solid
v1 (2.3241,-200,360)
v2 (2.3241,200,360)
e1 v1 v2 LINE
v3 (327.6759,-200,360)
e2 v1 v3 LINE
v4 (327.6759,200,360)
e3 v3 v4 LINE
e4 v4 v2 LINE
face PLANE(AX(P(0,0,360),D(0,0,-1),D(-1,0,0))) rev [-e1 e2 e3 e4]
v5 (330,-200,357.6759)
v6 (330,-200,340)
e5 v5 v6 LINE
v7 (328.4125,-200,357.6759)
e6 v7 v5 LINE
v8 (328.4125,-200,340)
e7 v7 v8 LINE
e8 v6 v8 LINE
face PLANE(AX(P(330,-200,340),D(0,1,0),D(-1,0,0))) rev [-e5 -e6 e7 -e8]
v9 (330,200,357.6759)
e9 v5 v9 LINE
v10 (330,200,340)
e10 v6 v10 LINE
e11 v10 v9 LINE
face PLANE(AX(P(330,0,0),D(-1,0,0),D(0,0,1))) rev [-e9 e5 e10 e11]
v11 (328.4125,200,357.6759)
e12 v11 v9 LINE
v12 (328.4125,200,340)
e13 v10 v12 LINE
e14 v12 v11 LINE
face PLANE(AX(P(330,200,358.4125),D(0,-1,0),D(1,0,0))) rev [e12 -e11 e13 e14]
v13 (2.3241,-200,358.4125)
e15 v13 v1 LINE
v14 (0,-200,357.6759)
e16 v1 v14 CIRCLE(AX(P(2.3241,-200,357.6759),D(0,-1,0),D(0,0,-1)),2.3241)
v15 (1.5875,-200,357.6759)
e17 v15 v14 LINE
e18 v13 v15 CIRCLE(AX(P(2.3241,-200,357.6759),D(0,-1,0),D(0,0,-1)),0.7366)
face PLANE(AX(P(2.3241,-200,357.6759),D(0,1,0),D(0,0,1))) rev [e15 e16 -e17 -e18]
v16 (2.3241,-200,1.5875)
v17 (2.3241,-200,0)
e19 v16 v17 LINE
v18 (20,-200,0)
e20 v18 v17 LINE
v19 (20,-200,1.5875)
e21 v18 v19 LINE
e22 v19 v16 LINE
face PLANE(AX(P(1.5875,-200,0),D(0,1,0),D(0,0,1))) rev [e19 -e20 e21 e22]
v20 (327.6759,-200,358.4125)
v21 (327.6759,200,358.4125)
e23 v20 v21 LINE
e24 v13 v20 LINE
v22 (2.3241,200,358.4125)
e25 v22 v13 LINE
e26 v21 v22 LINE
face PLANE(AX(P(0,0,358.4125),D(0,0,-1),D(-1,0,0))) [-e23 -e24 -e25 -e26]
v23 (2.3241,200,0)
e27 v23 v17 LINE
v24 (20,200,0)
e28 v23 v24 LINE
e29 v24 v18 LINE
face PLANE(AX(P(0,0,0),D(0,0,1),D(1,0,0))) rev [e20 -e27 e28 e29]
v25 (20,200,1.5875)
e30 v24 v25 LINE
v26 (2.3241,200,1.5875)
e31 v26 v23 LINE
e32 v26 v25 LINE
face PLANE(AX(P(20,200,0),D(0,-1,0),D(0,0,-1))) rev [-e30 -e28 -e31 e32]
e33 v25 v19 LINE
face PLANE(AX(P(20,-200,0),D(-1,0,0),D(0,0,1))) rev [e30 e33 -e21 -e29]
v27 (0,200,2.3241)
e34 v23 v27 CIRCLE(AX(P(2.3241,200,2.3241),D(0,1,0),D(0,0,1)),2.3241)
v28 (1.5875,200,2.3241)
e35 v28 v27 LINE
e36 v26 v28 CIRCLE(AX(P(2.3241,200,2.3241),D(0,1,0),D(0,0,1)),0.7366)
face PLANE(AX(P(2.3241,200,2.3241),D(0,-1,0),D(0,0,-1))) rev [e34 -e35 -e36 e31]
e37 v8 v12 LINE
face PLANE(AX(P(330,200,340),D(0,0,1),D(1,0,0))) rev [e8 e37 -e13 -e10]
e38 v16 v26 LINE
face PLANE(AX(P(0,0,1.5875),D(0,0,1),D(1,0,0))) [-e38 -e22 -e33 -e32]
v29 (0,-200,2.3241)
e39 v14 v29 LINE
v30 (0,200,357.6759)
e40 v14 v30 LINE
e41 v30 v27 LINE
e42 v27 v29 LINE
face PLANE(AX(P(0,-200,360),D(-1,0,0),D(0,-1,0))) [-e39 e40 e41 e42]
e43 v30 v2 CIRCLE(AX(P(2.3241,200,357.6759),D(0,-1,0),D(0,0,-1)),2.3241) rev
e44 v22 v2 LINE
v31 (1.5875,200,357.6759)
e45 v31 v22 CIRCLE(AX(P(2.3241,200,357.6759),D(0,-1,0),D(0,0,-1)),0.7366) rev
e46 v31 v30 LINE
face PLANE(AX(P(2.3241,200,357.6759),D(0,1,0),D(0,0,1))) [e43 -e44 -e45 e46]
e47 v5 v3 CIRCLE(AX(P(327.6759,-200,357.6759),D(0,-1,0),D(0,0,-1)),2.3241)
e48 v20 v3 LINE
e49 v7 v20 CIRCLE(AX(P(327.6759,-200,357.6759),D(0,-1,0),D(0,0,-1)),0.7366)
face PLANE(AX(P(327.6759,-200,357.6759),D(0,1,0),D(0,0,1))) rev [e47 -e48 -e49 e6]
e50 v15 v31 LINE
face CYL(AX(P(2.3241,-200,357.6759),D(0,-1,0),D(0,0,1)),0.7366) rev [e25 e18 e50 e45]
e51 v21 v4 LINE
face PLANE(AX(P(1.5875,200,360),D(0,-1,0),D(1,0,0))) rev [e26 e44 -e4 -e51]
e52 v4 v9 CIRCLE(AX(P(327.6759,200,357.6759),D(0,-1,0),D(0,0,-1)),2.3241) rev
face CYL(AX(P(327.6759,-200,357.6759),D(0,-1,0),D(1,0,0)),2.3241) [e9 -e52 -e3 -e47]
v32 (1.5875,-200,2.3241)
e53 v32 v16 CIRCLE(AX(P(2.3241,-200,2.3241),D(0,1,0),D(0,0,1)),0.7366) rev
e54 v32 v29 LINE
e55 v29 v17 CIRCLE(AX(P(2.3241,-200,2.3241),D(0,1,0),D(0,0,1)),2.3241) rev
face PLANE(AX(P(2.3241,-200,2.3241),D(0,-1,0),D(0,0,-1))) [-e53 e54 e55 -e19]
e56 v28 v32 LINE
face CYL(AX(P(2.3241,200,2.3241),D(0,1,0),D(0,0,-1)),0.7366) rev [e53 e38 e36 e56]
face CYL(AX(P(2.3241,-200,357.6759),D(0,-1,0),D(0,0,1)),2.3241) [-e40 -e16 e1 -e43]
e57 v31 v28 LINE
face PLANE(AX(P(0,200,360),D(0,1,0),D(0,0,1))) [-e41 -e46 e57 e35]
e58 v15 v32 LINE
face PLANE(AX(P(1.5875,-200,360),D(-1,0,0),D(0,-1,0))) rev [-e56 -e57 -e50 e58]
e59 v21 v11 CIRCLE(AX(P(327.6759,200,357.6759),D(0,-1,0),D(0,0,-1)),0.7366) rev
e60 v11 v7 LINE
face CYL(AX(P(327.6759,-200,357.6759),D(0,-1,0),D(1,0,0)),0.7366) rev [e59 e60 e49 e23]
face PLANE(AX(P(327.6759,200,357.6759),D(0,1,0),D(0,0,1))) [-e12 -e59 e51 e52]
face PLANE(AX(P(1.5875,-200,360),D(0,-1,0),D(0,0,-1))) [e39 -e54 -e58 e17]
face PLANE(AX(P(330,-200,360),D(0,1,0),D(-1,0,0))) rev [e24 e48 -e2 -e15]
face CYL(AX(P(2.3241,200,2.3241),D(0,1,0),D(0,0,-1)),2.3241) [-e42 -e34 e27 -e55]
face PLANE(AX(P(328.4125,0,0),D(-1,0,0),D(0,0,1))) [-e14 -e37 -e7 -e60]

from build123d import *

# Parameters (mm, degrees)
SKETCH1_W                      = 1.5875
SKETCH1_H                      = 400
BASE_FLANGE1_DEPTH             = 360
EDGE_FLANGE1_STRIP_W           = 7.8232
EDGE_FLANGE1_STRIP_H           = 1.5875
EDGE_FLANGE1_STRIP_CUT_DEPTH   = 400
EDGE_FLANGE1_DEPTH             = 400
EDGE_FLANGE2_STRIP_W           = 7.8232
EDGE_FLANGE2_STRIP_H           = 1.5875
EDGE_FLANGE2_STRIP_CUT_DEPTH   = 400
EDGE_FLANGE2_STRIP_2_W         = 7.8232
EDGE_FLANGE2_STRIP_2_H         = 1.5875
EDGE_FLANGE2_STRIP_CUT_2_DEPTH = 400
EDGE_FLANGE2_DEPTH             = 400
EDGE_FLANGE2_BEND_DEPTH        = 400


# Sheet-metal steps are written as plain solids
with BuildPart() as part:
    # Sketch1 → Base-Flange1 (new body)
    with BuildSketch(Plane.XY):
        with Locations((0.79375, 0)):
            Rectangle(SKETCH1_W, SKETCH1_H)
    extrude(amount=BASE_FLANGE1_DEPTH)

    # Edge-Flange1 strip (across the edge) → Edge-Flange1 strip cut (cut)
    with BuildSketch(Plane(origin=(1.5875, 200, 360), x_dir=(0, 0, -1), z_dir=(0, -1, 0))):
        with Locations((-1.5875, -0.79375)):
            Rectangle(EDGE_FLANGE1_STRIP_W, EDGE_FLANGE1_STRIP_H)
    extrude(amount=EDGE_FLANGE1_STRIP_CUT_DEPTH, mode=Mode.SUBTRACT)

    # Edge-Flange1 section (across the edge) → Edge-Flange1 (add)
    with BuildSketch(Plane(origin=(1.5875, 200, 360), x_dir=(0, 0, -1), z_dir=(0, -1, 0))):
        with BuildLine():
            Line((0, 0.7366), (0, 328.4125))
            Line((0, 328.4125), (1.5875, 328.4125))
            Line((1.5875, 328.4125), (1.5875, 0.7366))
            ThreePointArc((1.5875, 0.7366), (1.803245145, 0.215745145), (2.3241, 0))
            Line((2.3241, 0), (2.3241, -1.5875))
            ThreePointArc((2.3241, -1.5875), (0.68071313, -0.90678687), (0, 0.7366))
        make_face()
    extrude(amount=EDGE_FLANGE1_DEPTH)

    # Edge-Flange2 strip (across the edge) → Edge-Flange2 strip cut (cut)
    with BuildSketch(Plane(origin=(330, 200, 358.4125), x_dir=(-1, 0, 0), z_dir=(0, -1, 0))):
        with Locations((-1.5875, -0.79375)):
            Rectangle(EDGE_FLANGE2_STRIP_W, EDGE_FLANGE2_STRIP_H)
    extrude(amount=EDGE_FLANGE2_STRIP_CUT_DEPTH, mode=Mode.SUBTRACT)

    # Edge-Flange2 strip 2 (across the edge) → Edge-Flange2 strip cut 2 (cut)
    with BuildSketch(Plane(origin=(1.5875, -200, 0), x_dir=(0, 0, 1), z_dir=(0, 1, 0))):
        with Locations((-1.5875, -0.79375)):
            Rectangle(EDGE_FLANGE2_STRIP_2_W, EDGE_FLANGE2_STRIP_2_H)
    extrude(amount=EDGE_FLANGE2_STRIP_CUT_2_DEPTH, mode=Mode.SUBTRACT)

    # Edge-Flange2 section (across the edge) → Edge-Flange2 (add)
    with BuildSketch(Plane(origin=(330, 200, 358.4125), x_dir=(-1, 0, 0), z_dir=(0, -1, 0))):
        with BuildLine():
            Line((0, 0.7366), (0, 18.4125))
            Line((0, 18.4125), (1.5875, 18.4125))
            Line((1.5875, 18.4125), (1.5875, 0.7366))
            ThreePointArc((1.5875, 0.7366), (1.803245145, 0.215745145), (2.3241, 0))
            Line((2.3241, 0), (2.3241, -1.5875))
            ThreePointArc((2.3241, -1.5875), (0.68071313, -0.90678687), (0, 0.7366))
        make_face()
    extrude(amount=EDGE_FLANGE2_DEPTH)

    # Edge-Flange2 section 2 (across the edge) → Edge-Flange2 bend (add)
    with BuildSketch(Plane(origin=(1.5875, -200, 0), x_dir=(0, 0, 1), z_dir=(0, 1, 0))):
        with BuildLine():
            Line((0, 0.7366), (0, 18.4125))
            Line((0, 18.4125), (1.5875, 18.4125))
            Line((1.5875, 18.4125), (1.5875, 0.7366))
            ThreePointArc((1.5875, 0.7366), (1.803245145, 0.215745145), (2.3241, 0))
            Line((2.3241, 0), (2.3241, -1.5875))
            ThreePointArc((2.3241, -1.5875), (0.68071313, -0.90678687), (0, 0.7366))
        make_face()
    extrude(amount=EDGE_FLANGE2_BEND_DEPTH)


solid = part.part
